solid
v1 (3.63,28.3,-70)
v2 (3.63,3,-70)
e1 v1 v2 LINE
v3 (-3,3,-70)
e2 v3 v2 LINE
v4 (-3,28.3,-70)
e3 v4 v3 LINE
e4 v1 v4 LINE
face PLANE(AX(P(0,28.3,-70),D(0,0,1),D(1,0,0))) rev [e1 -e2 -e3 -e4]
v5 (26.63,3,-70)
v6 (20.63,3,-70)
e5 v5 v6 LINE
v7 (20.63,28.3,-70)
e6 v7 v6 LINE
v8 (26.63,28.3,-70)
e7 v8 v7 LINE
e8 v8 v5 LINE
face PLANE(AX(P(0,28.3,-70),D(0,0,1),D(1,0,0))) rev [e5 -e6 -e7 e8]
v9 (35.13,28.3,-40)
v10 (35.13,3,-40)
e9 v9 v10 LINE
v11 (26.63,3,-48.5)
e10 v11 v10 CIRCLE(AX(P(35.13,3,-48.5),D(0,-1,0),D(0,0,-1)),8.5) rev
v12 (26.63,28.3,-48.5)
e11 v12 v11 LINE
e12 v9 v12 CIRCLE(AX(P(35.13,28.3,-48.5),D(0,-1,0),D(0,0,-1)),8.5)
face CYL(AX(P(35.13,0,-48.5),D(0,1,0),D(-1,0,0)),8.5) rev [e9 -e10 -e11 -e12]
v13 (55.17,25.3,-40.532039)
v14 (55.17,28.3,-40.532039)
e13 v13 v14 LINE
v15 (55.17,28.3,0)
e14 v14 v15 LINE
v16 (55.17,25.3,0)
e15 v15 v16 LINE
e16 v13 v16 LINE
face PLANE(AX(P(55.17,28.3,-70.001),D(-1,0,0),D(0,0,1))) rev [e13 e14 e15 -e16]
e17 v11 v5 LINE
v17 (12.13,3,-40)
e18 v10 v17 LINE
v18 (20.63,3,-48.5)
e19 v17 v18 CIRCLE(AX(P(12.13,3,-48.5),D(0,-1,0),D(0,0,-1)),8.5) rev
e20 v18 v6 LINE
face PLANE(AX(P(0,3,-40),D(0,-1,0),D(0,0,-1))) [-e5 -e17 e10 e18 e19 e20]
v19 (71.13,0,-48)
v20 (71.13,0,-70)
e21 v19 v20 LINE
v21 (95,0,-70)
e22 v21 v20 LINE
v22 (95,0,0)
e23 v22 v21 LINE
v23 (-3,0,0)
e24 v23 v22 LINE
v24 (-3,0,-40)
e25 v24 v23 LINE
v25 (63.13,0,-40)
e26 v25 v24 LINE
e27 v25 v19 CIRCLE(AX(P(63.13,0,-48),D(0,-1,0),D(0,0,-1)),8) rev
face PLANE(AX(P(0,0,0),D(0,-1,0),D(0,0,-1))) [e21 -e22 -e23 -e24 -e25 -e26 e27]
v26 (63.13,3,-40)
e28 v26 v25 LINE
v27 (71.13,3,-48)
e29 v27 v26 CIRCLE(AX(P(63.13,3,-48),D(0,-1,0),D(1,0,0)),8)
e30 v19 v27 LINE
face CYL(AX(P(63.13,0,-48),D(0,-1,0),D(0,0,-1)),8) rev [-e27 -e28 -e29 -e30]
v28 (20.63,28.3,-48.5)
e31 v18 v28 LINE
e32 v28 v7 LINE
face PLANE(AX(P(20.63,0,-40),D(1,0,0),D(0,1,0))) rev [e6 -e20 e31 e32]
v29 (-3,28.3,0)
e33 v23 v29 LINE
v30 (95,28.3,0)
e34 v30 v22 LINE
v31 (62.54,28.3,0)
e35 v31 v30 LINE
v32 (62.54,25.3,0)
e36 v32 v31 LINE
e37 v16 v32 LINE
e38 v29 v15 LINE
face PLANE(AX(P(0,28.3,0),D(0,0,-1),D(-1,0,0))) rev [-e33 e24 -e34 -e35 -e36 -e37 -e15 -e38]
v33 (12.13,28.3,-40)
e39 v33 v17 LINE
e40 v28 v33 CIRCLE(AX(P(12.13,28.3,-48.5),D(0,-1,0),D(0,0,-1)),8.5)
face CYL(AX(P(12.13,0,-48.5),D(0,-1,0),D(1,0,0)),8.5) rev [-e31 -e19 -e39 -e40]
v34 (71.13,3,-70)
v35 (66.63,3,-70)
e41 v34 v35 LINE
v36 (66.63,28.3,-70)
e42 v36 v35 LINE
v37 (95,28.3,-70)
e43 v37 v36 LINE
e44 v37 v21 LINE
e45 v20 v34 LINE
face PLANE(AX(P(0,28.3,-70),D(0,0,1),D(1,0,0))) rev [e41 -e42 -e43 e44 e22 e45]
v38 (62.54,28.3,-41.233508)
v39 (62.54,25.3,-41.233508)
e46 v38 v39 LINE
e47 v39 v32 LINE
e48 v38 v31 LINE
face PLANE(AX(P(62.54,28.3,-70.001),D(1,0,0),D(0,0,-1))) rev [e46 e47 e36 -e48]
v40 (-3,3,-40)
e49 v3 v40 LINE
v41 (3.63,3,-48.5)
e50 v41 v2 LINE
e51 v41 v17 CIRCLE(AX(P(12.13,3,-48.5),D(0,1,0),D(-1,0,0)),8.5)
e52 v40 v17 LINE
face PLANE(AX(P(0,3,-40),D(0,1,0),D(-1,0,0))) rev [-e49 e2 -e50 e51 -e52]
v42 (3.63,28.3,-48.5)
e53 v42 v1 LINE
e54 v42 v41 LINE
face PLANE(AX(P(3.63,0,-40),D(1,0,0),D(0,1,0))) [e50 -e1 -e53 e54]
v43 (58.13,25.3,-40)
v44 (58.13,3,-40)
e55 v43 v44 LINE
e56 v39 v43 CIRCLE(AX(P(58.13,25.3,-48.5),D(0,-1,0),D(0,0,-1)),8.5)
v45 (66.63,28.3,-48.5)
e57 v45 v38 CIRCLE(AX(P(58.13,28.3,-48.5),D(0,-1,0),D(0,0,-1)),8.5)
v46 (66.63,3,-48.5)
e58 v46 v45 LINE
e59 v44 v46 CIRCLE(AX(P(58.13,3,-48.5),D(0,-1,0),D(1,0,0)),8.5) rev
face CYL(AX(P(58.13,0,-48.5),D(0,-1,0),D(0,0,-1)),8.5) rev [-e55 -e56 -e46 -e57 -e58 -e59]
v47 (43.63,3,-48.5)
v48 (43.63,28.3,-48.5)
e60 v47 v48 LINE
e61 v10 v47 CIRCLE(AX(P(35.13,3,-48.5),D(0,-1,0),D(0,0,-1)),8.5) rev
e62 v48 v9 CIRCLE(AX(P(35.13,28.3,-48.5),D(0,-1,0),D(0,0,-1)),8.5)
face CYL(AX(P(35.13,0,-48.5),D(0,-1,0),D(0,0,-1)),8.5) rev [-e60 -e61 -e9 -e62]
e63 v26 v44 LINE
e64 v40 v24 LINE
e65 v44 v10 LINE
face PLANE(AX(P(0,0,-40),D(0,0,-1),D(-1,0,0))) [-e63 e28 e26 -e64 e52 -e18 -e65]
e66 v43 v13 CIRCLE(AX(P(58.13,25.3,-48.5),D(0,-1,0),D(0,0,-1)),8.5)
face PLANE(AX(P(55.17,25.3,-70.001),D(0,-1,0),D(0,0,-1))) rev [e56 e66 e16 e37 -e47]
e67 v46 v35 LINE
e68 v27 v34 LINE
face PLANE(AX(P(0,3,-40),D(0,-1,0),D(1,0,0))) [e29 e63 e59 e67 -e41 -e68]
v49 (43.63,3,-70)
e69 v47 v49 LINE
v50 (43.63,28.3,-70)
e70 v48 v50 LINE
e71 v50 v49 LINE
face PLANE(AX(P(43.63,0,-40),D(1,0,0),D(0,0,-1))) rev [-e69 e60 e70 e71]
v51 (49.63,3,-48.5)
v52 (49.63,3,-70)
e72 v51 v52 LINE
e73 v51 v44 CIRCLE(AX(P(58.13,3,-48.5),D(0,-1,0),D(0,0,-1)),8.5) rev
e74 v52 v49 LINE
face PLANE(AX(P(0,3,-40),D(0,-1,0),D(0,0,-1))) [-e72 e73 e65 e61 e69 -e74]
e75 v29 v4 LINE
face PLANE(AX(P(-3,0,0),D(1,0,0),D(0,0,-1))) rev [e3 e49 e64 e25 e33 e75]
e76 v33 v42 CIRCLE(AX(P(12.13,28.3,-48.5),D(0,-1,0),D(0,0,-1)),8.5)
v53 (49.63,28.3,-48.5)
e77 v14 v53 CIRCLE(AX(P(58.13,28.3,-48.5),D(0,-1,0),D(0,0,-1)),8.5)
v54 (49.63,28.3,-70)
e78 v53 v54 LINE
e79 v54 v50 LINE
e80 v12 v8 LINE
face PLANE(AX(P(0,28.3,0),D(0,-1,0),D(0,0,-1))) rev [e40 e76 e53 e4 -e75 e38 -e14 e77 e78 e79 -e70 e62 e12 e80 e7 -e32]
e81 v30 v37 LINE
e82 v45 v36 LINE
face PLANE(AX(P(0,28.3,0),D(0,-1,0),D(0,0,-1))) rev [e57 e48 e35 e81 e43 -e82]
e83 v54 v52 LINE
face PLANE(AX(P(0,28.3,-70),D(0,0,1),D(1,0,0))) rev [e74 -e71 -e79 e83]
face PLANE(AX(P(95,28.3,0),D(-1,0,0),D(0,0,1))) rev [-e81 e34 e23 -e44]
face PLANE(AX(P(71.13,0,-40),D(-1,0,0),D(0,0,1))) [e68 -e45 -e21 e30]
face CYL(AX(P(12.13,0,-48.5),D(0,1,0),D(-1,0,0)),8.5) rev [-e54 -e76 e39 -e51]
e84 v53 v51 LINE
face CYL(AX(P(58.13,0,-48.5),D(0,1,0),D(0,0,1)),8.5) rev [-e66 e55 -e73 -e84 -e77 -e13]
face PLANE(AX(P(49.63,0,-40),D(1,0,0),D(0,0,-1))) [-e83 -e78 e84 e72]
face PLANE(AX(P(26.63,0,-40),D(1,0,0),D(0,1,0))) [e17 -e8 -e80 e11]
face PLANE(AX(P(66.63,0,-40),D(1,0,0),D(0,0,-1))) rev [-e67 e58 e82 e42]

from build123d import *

# Parameters (mm, degrees)
SKIZZE1_W                       = 95
SKIZZE1_H                       = 70
AUFSATZ_LINEAR_AUSTRAGEN1_DEPTH = 28.3
SCHNITT_LINEAR_AUSTRAGEN1_REACH = 123.35
SKIZZE2_W                       = 7.37
SKIZZE2_H                       = 3
SCHNITT_LINEAR_AUSTRAGEN2_DEPTH = 30
VERRUNDUNG1_R                   = 8.5
AUFSATZ_LINEAR_AUSTRAGEN3_DEPTH = 3
VERRUNDUNG2_R                   = 8


with BuildPart() as part:
    # Skizze1 → Aufsatz-Linear austragen1 (new body)
    with BuildSketch(Plane(origin=(0, 0, 0), x_dir=(1, 0, 0), z_dir=(0, 1, 0))):
        with Locations((47.5, 35)):
            Rectangle(SKIZZE1_W, SKIZZE1_H)
    extrude(amount=AUFSATZ_LINEAR_AUSTRAGEN1_DEPTH)

    # Skizze2 → Schnitt-Linear austragen1 (cut, up to next)
    with BuildSketch(Plane.XY, mode=Mode.PRIVATE) as schnitt_linear_austragen1_sk1:
        with Locations((58.855, 26.8)):
            Rectangle(SKIZZE2_W, SKIZZE2_H)
    schnitt_linear_austragen1_tool1 = extrude(schnitt_linear_austragen1_sk1.sketch, amount=-SCHNITT_LINEAR_AUSTRAGEN1_REACH, mode=Mode.PRIVATE) & part.part
    add(schnitt_linear_austragen1_tool1.solids().sort_by_distance((58.855, 26.8, 0))[0], mode=Mode.SUBTRACT)

    # Skizze4 → Schnitt-Linear austragen2 (cut)
    with BuildSketch(Plane(origin=(0, 0, -70), x_dir=(-1, 0, 0), z_dir=(0, 0, -1))):
        Polygon((-3.63, 0), (-71.13, 0), (-71.13, 3), (-66.63, 3), (-66.63, 28.3), (-49.63, 28.3), (-49.63, 3), (-43.63, 3), (-43.63, 28.3), (-26.63, 28.3), (-26.63, 3), (-20.63, 3), (-20.63, 28.3), (-3.63, 28.3), (-3.63, 3), (0, 3), (0, 0), align=None)
    extrude(amount=-SCHNITT_LINEAR_AUSTRAGEN2_DEPTH, mode=Mode.SUBTRACT)

    # Verrundung1
    verrundung1_edges = [part.edges().sort_by_distance(p)[0] for p in [
        (3.63, 15.65, -40),
        (20.63, 15.65, -40),
        (26.63, 15.65, -40),
        (43.63, 15.65, -40),
        (49.63, 15.65, -40),
        (66.63, 15.65, -40),
    ]]
    fillet(verrundung1_edges, radius=VERRUNDUNG1_R - 0.0001)  # a hair under: the kernel refuses the full size

    # Skizze5 → Aufsatz-Linear austragen3 (add)
    with BuildSketch(Plane.ZY):
        Polygon((0, 0), (-40, 0), (-40, 3), (-70, 3), (-70, 28.3), (0, 28.3), align=None)
    extrude(amount=AUFSATZ_LINEAR_AUSTRAGEN3_DEPTH)

    # Verrundung2
    verrundung2_edges = [part.edges().sort_by_distance(p)[0] for p in [
        (71.13, 1.5, -40),
    ]]
    fillet(verrundung2_edges, radius=VERRUNDUNG2_R)


solid = part.part
